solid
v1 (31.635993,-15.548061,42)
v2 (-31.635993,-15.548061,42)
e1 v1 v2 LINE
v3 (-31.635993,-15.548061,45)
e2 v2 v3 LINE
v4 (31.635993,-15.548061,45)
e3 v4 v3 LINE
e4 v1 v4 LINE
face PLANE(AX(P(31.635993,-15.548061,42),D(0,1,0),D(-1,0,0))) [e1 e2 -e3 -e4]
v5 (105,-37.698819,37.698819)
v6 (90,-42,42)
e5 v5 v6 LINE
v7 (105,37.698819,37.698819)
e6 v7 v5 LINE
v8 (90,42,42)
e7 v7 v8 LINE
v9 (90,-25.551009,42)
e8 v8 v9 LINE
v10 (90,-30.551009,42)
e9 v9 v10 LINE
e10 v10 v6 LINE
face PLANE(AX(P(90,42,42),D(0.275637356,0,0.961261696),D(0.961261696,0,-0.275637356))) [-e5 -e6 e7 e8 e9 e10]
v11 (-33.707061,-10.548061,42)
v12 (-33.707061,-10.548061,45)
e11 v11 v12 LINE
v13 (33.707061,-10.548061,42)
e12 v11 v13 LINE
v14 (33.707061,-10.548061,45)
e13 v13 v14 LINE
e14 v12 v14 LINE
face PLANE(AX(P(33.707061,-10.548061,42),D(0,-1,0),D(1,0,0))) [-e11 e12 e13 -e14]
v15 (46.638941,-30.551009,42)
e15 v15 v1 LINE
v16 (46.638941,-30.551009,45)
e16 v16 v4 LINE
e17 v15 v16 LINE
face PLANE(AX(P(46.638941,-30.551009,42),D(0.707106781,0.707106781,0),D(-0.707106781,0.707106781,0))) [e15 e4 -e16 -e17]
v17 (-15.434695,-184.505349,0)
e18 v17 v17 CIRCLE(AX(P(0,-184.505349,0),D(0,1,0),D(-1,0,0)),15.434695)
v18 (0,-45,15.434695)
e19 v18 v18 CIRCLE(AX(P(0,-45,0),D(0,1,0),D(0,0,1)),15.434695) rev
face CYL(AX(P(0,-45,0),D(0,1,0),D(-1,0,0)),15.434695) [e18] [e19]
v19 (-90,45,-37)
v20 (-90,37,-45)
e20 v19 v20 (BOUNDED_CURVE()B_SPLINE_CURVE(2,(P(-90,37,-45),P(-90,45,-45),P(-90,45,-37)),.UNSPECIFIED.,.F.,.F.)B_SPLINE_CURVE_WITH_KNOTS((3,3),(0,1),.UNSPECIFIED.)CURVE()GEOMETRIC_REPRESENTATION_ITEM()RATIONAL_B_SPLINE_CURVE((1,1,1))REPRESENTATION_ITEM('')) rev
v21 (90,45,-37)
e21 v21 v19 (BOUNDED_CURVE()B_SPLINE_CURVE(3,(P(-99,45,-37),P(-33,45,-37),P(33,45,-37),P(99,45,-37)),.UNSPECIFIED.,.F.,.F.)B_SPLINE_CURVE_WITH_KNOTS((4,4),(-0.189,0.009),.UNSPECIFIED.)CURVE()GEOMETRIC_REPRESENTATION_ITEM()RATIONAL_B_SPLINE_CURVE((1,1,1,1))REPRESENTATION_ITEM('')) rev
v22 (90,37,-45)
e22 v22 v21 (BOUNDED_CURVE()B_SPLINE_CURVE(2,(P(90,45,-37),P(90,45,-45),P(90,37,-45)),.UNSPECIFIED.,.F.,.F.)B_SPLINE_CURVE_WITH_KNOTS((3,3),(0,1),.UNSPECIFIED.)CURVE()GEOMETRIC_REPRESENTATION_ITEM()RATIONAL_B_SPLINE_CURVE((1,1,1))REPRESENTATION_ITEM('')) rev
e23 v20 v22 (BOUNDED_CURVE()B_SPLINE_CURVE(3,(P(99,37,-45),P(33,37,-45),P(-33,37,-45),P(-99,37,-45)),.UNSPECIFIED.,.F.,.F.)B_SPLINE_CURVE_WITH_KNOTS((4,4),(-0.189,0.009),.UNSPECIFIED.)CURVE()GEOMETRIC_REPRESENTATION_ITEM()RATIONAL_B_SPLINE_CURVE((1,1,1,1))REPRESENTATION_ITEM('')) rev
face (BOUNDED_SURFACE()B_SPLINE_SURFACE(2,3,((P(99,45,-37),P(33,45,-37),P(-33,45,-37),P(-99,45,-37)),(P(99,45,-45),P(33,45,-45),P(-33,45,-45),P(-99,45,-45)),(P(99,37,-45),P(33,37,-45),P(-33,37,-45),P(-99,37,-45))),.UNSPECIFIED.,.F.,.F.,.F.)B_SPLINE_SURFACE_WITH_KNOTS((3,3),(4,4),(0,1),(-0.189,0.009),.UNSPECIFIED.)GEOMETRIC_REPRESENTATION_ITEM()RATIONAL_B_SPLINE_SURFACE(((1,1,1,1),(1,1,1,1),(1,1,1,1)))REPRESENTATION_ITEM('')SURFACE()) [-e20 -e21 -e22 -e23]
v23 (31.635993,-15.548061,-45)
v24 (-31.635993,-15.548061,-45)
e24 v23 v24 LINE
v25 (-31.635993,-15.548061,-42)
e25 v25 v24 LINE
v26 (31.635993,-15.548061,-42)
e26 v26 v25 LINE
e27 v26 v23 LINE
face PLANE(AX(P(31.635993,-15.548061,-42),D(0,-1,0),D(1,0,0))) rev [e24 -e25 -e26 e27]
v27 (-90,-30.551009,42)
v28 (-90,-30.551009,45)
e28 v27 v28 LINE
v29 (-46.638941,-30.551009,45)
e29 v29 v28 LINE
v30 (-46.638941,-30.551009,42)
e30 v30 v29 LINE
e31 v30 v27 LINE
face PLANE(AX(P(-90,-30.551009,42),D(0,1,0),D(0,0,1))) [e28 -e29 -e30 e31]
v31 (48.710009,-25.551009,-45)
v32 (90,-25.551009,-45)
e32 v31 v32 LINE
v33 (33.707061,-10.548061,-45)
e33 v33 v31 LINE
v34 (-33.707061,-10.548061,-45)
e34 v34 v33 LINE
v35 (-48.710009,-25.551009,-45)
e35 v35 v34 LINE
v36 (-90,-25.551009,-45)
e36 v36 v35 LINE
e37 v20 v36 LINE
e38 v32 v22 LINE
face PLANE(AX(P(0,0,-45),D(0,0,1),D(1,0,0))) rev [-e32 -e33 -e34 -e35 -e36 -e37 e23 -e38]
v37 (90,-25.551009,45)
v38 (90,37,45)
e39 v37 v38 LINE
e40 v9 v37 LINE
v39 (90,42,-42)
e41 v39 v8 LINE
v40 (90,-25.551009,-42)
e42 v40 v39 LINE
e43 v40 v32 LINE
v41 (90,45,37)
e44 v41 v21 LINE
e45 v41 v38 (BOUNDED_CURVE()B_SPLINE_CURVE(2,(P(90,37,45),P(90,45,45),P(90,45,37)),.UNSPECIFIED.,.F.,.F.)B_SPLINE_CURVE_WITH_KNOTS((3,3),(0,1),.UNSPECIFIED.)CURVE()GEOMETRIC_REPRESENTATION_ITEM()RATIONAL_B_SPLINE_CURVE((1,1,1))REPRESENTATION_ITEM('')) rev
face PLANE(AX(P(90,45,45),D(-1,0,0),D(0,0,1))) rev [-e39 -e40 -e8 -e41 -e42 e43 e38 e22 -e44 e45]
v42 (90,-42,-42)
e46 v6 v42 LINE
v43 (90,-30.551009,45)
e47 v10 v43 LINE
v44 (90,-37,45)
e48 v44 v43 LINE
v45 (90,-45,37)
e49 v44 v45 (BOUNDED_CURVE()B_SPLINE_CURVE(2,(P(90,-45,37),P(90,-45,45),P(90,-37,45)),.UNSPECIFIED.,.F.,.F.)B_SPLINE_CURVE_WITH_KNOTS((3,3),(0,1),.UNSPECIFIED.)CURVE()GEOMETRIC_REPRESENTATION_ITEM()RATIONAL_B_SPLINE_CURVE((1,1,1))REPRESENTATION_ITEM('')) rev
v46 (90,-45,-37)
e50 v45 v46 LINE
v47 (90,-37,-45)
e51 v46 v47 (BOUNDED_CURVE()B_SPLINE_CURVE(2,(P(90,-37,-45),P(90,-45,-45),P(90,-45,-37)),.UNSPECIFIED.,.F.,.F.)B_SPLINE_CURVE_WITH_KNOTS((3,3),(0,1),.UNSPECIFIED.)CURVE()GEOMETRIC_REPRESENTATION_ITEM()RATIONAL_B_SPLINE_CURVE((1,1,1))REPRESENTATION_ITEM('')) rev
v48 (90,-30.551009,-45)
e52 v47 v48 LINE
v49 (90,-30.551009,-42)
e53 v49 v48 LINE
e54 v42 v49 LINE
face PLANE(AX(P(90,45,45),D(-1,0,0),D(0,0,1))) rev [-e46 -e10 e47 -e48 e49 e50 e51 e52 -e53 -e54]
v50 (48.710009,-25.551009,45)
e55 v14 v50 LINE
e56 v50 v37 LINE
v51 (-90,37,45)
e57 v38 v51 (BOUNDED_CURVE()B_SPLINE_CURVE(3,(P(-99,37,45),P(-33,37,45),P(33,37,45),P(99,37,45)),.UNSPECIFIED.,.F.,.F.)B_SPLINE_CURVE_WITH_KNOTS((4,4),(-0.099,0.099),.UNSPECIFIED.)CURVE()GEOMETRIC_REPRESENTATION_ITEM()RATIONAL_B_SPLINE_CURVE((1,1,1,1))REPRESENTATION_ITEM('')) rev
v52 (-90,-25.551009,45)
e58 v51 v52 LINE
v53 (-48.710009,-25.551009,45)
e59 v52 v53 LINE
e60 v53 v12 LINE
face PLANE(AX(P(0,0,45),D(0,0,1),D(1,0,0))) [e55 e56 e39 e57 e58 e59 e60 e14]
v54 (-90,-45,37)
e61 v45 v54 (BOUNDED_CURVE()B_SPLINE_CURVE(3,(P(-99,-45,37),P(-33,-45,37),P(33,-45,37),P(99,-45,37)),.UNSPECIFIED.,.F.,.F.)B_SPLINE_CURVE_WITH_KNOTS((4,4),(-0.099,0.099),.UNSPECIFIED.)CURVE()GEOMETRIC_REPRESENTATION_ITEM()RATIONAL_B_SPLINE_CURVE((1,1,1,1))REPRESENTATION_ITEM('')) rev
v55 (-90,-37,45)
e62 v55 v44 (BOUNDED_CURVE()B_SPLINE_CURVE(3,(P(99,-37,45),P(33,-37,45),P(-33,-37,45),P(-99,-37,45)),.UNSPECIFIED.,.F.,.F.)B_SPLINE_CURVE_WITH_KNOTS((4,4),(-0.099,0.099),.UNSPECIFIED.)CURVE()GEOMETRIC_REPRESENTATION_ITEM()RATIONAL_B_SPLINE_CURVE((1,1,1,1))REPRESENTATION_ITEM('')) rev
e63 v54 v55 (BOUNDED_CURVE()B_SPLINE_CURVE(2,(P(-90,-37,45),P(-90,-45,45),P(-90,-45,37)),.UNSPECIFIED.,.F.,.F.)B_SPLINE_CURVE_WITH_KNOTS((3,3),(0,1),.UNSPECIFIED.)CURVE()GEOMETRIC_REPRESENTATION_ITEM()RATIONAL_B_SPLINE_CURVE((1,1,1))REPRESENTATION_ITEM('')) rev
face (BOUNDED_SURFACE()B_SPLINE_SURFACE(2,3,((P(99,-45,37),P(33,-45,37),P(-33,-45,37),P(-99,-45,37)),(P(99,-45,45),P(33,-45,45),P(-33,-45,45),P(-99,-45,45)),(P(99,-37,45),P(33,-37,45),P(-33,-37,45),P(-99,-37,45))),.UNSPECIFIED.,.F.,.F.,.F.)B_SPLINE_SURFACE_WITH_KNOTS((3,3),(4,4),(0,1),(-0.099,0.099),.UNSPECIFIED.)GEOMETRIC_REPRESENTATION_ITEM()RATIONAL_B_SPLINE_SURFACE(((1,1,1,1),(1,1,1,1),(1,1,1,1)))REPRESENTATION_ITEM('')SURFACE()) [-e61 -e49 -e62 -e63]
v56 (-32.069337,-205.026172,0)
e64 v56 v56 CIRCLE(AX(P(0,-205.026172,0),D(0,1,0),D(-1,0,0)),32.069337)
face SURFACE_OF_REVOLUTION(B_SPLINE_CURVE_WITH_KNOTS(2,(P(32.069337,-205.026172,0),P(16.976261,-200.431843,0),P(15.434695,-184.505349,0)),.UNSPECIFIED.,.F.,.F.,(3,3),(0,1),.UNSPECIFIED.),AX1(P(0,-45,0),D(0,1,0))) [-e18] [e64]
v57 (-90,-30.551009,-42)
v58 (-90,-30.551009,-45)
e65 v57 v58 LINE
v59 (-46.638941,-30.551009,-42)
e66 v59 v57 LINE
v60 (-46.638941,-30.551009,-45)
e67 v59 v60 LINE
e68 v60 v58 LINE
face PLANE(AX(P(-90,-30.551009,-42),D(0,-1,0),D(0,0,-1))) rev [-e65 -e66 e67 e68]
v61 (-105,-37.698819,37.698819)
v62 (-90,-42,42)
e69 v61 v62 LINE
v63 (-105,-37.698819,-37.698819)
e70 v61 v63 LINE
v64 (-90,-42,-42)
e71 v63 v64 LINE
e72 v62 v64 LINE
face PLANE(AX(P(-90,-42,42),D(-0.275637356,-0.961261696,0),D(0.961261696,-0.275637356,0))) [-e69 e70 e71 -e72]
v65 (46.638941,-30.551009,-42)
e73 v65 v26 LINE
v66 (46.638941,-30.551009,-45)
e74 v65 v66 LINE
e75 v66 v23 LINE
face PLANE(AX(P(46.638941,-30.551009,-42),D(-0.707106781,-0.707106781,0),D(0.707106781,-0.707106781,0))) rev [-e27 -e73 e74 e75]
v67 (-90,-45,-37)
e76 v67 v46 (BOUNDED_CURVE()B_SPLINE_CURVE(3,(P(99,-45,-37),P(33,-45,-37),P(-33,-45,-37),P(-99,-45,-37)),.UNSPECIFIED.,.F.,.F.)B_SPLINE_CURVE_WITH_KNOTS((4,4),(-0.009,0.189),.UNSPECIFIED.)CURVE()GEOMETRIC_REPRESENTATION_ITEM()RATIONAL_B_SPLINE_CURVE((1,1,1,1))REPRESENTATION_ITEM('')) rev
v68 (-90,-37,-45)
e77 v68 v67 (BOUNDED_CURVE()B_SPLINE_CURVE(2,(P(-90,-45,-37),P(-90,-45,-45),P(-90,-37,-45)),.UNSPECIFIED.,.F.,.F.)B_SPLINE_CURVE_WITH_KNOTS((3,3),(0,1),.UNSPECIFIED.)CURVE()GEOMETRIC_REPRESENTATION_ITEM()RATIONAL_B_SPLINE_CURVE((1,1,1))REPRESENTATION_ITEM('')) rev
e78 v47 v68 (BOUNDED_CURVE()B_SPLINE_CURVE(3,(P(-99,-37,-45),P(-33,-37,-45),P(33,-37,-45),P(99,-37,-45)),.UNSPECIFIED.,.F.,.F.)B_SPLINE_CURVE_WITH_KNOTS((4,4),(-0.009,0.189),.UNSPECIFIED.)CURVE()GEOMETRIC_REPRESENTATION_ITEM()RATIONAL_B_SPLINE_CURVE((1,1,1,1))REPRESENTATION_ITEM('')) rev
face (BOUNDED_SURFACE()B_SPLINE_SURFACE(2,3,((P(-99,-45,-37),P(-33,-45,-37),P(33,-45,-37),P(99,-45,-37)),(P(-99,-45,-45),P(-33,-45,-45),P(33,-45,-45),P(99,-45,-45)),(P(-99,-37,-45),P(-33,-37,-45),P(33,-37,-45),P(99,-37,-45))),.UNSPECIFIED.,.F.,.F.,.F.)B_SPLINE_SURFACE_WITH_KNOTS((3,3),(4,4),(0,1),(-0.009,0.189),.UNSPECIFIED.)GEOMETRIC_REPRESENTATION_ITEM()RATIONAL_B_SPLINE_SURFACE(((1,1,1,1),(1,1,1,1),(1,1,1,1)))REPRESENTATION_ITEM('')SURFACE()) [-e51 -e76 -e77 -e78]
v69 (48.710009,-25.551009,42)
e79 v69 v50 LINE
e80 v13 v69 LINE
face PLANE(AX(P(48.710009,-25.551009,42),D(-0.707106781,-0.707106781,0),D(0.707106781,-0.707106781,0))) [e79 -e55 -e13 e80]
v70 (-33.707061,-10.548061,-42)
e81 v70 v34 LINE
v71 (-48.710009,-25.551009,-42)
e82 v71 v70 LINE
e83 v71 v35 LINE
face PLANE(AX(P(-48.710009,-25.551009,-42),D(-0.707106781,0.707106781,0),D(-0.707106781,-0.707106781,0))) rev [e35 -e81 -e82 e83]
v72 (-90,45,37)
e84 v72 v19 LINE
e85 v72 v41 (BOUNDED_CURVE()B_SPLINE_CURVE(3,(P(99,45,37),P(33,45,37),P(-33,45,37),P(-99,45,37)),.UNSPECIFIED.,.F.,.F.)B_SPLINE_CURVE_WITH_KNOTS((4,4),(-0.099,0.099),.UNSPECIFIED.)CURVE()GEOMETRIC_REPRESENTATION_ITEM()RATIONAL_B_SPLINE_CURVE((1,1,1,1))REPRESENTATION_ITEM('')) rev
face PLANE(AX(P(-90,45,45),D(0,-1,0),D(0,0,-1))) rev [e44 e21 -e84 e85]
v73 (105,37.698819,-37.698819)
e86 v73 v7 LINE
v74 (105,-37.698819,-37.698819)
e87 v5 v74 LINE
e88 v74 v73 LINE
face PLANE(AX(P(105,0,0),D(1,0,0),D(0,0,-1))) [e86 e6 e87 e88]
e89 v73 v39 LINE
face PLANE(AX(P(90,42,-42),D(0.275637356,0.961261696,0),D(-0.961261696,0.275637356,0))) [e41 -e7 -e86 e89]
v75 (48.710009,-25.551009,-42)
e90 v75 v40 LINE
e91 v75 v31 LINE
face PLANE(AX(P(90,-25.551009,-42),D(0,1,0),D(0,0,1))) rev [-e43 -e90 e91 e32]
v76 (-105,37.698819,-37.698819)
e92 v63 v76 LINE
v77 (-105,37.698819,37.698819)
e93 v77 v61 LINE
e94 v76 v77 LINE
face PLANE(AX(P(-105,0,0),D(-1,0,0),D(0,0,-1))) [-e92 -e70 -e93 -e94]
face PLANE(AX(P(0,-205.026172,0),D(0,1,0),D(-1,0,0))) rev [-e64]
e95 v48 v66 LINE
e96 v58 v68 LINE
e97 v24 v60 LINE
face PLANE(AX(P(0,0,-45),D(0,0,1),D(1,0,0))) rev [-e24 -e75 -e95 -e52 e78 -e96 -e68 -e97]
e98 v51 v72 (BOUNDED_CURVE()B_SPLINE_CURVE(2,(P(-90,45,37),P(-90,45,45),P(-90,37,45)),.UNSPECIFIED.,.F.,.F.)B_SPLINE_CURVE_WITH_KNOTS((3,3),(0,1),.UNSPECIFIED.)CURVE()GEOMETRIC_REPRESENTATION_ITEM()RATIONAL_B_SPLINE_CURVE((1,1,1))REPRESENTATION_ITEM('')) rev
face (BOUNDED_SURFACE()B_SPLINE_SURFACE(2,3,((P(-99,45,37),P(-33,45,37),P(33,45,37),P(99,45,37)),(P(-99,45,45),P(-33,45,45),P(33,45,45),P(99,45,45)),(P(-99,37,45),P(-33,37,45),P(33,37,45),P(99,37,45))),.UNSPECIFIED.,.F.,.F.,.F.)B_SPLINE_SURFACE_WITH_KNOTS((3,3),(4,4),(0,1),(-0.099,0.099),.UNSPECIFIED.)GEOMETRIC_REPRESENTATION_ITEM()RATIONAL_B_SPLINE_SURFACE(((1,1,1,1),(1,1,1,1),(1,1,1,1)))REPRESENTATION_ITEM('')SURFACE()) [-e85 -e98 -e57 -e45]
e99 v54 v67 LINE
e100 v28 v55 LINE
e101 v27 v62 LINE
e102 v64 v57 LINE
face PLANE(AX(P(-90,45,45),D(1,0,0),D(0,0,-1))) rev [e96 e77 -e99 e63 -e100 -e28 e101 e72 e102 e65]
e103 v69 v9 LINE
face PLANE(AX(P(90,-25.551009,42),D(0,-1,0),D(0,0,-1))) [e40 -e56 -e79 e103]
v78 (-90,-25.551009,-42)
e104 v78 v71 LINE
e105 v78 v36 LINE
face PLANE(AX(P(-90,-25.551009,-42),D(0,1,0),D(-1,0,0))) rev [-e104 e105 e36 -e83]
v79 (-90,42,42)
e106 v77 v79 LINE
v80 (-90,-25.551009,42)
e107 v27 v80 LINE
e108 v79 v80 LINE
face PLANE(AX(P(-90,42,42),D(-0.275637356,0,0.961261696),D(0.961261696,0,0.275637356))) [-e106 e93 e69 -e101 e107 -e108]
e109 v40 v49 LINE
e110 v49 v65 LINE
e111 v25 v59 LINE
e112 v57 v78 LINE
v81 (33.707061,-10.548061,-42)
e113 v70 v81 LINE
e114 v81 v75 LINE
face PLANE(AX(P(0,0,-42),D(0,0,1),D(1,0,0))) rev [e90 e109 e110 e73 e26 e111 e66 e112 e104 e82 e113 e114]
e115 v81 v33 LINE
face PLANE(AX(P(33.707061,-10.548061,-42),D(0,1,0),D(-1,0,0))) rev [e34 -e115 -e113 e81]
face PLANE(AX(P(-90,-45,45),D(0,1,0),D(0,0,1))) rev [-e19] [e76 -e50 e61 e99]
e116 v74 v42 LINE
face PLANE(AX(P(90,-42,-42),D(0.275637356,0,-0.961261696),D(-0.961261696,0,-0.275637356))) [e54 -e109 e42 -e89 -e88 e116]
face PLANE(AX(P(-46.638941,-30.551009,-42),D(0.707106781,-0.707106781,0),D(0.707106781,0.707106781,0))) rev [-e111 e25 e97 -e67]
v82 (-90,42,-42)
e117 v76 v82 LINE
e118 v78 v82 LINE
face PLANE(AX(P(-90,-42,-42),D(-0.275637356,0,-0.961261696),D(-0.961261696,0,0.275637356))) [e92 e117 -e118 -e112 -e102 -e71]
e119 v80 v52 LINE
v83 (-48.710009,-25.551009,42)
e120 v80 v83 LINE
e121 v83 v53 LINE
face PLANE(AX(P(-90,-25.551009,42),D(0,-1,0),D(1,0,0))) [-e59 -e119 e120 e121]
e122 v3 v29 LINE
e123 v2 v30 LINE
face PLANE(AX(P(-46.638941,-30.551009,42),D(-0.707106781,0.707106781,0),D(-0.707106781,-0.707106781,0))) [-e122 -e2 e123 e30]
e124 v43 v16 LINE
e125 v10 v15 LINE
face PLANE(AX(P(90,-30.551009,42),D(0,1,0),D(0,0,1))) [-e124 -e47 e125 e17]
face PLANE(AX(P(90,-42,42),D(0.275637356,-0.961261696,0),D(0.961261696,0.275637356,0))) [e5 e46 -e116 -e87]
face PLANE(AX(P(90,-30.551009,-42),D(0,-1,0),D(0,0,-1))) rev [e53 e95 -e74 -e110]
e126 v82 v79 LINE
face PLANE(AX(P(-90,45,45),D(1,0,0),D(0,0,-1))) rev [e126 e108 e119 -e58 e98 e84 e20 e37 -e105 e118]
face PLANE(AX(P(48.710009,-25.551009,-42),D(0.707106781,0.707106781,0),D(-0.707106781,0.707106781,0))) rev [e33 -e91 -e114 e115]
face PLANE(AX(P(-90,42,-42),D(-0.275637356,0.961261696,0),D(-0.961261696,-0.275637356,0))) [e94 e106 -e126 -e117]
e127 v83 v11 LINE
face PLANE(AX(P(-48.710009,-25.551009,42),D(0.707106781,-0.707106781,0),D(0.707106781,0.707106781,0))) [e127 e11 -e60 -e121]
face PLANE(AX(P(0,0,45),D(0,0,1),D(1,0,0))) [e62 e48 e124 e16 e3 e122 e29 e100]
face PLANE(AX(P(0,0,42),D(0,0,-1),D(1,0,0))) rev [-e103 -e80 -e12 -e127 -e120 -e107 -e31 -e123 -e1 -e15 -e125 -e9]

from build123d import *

# Parameters (mm, degrees)
SKETCH_1_W          = 180
SKETCH_1_H          = 90
EXTRUDE_1_DEPTH     = 45
SKETCH_3_W          = 84
SKETCH_3_H          = 84
EXTRUDE_3_DEPTH     = 15
EXTRUDE_3_TAPER     = 16
CUT_EXTRUDE_1_DEPTH = 3
FILLET_1_SIZE       = 8


with BuildPart() as part:
    # 草图1 → 凸台-拉伸1 (new, symmetric)
    with BuildSketch(Plane.XY):
        Rectangle(SKETCH_1_W, SKETCH_1_H)
    extrude(amount=EXTRUDE_1_DEPTH, both=True)

    # 草图3 → 凸台-拉伸3 (add)
    with BuildSketch(Plane(origin=(90, 0, 0), x_dir=(0, 0, -1), z_dir=(1, 0, 0))):
        Rectangle(SKETCH_3_W, SKETCH_3_H)
    extrude_3 = extrude(amount=EXTRUDE_3_DEPTH, taper=EXTRUDE_3_TAPER)

    # 镜向2: 凸台-拉伸3 across plane
    add(extrude_3.mirror(Plane(origin=(0, 0, 0), x_dir=(0, 0, 1), z_dir=(1, 0, 0))))

    # 草图5 → 切除-拉伸1 (cut)
    with BuildSketch(Plane(origin=(0, 0, -45), x_dir=(-1, 0, 0), z_dir=(0, 0, -1))):
        Polygon((-90, -25.551009309), (-48.710009236, -25.551009309), (-33.70706091, -10.548060984), (33.70706091, -10.548060984), (48.710009236, -25.551009309), (90, -25.551009309), (90, -30.551009309), (46.638941424, -30.551009309), (31.635993099, -15.548060984), (-31.635993099, -15.548060984), (-46.638941424, -30.551009309), (-90, -30.551009309), align=None)
    cut_extrude_1 = extrude(amount=-CUT_EXTRUDE_1_DEPTH, mode=Mode.SUBTRACT)

    # 镜向3: 切除-拉伸1 across plane
    add(cut_extrude_1.mirror(Plane.XY), mode=Mode.SUBTRACT)

    # 圆角1
    # a fillet whose section is not a circle: 8 mm, written as the material it takes off along each edge
    with BuildSketch(Plane(origin=(110, -45, -45), x_dir=(0, 0, 1), z_dir=(-1, 0, 0)), Plane(origin=(-110, 45, -45), x_dir=(0, 0, 1), z_dir=(1, 0, 0))) as fillet_1_piece_1:
        with BuildLine():
            Bezier((FILLET_1_SIZE, 0), (0, 0), (0, FILLET_1_SIZE), weights=[1, 1, 1])
            Line((0, FILLET_1_SIZE), (0, 0))
            Line((0, 0), (FILLET_1_SIZE, 0))
        make_face()
    extrude(amount=220, mode=Mode.SUBTRACT)
    with BuildSketch(Plane(origin=(-110, 45, 45), x_dir=(0, 0, -1), z_dir=(1, 0, 0)), Plane(origin=(110, -45, 45), x_dir=(0, 0, -1), z_dir=(-1, 0, 0))) as fillet_1_piece_2:
        with BuildLine():
            Bezier((FILLET_1_SIZE, 0), (0, 0), (0, -FILLET_1_SIZE), weights=[1, 1, 1])
            Line((0, -FILLET_1_SIZE), (0, 0))
            Line((0, 0), (FILLET_1_SIZE, 0))
        make_face()
    extrude(amount=220, mode=Mode.SUBTRACT)

    # 草图16 → 旋转1 (revolve)
    with BuildSketch(Plane.XY, mode=Mode.PRIVATE) as revolve_1_sk:
        with BuildLine():
            Line((0, -45), (0, -205.026171576))
            Line((0, -205.026171576), (32.069336895, -205.026171576))
            add(Edge.make_bspline(
                [(15.434694719, -184.505349345), (16.976260644, -200.431842868), (32.069336895, -205.026171576)],
                knots=[0, 0, 0, 1, 1, 1], degree=2))
            Line((15.434694719, -184.505349345), (15.434694719, -45))
            Line((15.434694719, -45), (0, -45))
        make_face()
    revolve(revolve_1_sk.sketch.rotate(Axis((0, -45, 0), (0, -1, 0)), 180), axis=Axis((0, -45, 0), (0, -1, 0)))


solid = part.part
